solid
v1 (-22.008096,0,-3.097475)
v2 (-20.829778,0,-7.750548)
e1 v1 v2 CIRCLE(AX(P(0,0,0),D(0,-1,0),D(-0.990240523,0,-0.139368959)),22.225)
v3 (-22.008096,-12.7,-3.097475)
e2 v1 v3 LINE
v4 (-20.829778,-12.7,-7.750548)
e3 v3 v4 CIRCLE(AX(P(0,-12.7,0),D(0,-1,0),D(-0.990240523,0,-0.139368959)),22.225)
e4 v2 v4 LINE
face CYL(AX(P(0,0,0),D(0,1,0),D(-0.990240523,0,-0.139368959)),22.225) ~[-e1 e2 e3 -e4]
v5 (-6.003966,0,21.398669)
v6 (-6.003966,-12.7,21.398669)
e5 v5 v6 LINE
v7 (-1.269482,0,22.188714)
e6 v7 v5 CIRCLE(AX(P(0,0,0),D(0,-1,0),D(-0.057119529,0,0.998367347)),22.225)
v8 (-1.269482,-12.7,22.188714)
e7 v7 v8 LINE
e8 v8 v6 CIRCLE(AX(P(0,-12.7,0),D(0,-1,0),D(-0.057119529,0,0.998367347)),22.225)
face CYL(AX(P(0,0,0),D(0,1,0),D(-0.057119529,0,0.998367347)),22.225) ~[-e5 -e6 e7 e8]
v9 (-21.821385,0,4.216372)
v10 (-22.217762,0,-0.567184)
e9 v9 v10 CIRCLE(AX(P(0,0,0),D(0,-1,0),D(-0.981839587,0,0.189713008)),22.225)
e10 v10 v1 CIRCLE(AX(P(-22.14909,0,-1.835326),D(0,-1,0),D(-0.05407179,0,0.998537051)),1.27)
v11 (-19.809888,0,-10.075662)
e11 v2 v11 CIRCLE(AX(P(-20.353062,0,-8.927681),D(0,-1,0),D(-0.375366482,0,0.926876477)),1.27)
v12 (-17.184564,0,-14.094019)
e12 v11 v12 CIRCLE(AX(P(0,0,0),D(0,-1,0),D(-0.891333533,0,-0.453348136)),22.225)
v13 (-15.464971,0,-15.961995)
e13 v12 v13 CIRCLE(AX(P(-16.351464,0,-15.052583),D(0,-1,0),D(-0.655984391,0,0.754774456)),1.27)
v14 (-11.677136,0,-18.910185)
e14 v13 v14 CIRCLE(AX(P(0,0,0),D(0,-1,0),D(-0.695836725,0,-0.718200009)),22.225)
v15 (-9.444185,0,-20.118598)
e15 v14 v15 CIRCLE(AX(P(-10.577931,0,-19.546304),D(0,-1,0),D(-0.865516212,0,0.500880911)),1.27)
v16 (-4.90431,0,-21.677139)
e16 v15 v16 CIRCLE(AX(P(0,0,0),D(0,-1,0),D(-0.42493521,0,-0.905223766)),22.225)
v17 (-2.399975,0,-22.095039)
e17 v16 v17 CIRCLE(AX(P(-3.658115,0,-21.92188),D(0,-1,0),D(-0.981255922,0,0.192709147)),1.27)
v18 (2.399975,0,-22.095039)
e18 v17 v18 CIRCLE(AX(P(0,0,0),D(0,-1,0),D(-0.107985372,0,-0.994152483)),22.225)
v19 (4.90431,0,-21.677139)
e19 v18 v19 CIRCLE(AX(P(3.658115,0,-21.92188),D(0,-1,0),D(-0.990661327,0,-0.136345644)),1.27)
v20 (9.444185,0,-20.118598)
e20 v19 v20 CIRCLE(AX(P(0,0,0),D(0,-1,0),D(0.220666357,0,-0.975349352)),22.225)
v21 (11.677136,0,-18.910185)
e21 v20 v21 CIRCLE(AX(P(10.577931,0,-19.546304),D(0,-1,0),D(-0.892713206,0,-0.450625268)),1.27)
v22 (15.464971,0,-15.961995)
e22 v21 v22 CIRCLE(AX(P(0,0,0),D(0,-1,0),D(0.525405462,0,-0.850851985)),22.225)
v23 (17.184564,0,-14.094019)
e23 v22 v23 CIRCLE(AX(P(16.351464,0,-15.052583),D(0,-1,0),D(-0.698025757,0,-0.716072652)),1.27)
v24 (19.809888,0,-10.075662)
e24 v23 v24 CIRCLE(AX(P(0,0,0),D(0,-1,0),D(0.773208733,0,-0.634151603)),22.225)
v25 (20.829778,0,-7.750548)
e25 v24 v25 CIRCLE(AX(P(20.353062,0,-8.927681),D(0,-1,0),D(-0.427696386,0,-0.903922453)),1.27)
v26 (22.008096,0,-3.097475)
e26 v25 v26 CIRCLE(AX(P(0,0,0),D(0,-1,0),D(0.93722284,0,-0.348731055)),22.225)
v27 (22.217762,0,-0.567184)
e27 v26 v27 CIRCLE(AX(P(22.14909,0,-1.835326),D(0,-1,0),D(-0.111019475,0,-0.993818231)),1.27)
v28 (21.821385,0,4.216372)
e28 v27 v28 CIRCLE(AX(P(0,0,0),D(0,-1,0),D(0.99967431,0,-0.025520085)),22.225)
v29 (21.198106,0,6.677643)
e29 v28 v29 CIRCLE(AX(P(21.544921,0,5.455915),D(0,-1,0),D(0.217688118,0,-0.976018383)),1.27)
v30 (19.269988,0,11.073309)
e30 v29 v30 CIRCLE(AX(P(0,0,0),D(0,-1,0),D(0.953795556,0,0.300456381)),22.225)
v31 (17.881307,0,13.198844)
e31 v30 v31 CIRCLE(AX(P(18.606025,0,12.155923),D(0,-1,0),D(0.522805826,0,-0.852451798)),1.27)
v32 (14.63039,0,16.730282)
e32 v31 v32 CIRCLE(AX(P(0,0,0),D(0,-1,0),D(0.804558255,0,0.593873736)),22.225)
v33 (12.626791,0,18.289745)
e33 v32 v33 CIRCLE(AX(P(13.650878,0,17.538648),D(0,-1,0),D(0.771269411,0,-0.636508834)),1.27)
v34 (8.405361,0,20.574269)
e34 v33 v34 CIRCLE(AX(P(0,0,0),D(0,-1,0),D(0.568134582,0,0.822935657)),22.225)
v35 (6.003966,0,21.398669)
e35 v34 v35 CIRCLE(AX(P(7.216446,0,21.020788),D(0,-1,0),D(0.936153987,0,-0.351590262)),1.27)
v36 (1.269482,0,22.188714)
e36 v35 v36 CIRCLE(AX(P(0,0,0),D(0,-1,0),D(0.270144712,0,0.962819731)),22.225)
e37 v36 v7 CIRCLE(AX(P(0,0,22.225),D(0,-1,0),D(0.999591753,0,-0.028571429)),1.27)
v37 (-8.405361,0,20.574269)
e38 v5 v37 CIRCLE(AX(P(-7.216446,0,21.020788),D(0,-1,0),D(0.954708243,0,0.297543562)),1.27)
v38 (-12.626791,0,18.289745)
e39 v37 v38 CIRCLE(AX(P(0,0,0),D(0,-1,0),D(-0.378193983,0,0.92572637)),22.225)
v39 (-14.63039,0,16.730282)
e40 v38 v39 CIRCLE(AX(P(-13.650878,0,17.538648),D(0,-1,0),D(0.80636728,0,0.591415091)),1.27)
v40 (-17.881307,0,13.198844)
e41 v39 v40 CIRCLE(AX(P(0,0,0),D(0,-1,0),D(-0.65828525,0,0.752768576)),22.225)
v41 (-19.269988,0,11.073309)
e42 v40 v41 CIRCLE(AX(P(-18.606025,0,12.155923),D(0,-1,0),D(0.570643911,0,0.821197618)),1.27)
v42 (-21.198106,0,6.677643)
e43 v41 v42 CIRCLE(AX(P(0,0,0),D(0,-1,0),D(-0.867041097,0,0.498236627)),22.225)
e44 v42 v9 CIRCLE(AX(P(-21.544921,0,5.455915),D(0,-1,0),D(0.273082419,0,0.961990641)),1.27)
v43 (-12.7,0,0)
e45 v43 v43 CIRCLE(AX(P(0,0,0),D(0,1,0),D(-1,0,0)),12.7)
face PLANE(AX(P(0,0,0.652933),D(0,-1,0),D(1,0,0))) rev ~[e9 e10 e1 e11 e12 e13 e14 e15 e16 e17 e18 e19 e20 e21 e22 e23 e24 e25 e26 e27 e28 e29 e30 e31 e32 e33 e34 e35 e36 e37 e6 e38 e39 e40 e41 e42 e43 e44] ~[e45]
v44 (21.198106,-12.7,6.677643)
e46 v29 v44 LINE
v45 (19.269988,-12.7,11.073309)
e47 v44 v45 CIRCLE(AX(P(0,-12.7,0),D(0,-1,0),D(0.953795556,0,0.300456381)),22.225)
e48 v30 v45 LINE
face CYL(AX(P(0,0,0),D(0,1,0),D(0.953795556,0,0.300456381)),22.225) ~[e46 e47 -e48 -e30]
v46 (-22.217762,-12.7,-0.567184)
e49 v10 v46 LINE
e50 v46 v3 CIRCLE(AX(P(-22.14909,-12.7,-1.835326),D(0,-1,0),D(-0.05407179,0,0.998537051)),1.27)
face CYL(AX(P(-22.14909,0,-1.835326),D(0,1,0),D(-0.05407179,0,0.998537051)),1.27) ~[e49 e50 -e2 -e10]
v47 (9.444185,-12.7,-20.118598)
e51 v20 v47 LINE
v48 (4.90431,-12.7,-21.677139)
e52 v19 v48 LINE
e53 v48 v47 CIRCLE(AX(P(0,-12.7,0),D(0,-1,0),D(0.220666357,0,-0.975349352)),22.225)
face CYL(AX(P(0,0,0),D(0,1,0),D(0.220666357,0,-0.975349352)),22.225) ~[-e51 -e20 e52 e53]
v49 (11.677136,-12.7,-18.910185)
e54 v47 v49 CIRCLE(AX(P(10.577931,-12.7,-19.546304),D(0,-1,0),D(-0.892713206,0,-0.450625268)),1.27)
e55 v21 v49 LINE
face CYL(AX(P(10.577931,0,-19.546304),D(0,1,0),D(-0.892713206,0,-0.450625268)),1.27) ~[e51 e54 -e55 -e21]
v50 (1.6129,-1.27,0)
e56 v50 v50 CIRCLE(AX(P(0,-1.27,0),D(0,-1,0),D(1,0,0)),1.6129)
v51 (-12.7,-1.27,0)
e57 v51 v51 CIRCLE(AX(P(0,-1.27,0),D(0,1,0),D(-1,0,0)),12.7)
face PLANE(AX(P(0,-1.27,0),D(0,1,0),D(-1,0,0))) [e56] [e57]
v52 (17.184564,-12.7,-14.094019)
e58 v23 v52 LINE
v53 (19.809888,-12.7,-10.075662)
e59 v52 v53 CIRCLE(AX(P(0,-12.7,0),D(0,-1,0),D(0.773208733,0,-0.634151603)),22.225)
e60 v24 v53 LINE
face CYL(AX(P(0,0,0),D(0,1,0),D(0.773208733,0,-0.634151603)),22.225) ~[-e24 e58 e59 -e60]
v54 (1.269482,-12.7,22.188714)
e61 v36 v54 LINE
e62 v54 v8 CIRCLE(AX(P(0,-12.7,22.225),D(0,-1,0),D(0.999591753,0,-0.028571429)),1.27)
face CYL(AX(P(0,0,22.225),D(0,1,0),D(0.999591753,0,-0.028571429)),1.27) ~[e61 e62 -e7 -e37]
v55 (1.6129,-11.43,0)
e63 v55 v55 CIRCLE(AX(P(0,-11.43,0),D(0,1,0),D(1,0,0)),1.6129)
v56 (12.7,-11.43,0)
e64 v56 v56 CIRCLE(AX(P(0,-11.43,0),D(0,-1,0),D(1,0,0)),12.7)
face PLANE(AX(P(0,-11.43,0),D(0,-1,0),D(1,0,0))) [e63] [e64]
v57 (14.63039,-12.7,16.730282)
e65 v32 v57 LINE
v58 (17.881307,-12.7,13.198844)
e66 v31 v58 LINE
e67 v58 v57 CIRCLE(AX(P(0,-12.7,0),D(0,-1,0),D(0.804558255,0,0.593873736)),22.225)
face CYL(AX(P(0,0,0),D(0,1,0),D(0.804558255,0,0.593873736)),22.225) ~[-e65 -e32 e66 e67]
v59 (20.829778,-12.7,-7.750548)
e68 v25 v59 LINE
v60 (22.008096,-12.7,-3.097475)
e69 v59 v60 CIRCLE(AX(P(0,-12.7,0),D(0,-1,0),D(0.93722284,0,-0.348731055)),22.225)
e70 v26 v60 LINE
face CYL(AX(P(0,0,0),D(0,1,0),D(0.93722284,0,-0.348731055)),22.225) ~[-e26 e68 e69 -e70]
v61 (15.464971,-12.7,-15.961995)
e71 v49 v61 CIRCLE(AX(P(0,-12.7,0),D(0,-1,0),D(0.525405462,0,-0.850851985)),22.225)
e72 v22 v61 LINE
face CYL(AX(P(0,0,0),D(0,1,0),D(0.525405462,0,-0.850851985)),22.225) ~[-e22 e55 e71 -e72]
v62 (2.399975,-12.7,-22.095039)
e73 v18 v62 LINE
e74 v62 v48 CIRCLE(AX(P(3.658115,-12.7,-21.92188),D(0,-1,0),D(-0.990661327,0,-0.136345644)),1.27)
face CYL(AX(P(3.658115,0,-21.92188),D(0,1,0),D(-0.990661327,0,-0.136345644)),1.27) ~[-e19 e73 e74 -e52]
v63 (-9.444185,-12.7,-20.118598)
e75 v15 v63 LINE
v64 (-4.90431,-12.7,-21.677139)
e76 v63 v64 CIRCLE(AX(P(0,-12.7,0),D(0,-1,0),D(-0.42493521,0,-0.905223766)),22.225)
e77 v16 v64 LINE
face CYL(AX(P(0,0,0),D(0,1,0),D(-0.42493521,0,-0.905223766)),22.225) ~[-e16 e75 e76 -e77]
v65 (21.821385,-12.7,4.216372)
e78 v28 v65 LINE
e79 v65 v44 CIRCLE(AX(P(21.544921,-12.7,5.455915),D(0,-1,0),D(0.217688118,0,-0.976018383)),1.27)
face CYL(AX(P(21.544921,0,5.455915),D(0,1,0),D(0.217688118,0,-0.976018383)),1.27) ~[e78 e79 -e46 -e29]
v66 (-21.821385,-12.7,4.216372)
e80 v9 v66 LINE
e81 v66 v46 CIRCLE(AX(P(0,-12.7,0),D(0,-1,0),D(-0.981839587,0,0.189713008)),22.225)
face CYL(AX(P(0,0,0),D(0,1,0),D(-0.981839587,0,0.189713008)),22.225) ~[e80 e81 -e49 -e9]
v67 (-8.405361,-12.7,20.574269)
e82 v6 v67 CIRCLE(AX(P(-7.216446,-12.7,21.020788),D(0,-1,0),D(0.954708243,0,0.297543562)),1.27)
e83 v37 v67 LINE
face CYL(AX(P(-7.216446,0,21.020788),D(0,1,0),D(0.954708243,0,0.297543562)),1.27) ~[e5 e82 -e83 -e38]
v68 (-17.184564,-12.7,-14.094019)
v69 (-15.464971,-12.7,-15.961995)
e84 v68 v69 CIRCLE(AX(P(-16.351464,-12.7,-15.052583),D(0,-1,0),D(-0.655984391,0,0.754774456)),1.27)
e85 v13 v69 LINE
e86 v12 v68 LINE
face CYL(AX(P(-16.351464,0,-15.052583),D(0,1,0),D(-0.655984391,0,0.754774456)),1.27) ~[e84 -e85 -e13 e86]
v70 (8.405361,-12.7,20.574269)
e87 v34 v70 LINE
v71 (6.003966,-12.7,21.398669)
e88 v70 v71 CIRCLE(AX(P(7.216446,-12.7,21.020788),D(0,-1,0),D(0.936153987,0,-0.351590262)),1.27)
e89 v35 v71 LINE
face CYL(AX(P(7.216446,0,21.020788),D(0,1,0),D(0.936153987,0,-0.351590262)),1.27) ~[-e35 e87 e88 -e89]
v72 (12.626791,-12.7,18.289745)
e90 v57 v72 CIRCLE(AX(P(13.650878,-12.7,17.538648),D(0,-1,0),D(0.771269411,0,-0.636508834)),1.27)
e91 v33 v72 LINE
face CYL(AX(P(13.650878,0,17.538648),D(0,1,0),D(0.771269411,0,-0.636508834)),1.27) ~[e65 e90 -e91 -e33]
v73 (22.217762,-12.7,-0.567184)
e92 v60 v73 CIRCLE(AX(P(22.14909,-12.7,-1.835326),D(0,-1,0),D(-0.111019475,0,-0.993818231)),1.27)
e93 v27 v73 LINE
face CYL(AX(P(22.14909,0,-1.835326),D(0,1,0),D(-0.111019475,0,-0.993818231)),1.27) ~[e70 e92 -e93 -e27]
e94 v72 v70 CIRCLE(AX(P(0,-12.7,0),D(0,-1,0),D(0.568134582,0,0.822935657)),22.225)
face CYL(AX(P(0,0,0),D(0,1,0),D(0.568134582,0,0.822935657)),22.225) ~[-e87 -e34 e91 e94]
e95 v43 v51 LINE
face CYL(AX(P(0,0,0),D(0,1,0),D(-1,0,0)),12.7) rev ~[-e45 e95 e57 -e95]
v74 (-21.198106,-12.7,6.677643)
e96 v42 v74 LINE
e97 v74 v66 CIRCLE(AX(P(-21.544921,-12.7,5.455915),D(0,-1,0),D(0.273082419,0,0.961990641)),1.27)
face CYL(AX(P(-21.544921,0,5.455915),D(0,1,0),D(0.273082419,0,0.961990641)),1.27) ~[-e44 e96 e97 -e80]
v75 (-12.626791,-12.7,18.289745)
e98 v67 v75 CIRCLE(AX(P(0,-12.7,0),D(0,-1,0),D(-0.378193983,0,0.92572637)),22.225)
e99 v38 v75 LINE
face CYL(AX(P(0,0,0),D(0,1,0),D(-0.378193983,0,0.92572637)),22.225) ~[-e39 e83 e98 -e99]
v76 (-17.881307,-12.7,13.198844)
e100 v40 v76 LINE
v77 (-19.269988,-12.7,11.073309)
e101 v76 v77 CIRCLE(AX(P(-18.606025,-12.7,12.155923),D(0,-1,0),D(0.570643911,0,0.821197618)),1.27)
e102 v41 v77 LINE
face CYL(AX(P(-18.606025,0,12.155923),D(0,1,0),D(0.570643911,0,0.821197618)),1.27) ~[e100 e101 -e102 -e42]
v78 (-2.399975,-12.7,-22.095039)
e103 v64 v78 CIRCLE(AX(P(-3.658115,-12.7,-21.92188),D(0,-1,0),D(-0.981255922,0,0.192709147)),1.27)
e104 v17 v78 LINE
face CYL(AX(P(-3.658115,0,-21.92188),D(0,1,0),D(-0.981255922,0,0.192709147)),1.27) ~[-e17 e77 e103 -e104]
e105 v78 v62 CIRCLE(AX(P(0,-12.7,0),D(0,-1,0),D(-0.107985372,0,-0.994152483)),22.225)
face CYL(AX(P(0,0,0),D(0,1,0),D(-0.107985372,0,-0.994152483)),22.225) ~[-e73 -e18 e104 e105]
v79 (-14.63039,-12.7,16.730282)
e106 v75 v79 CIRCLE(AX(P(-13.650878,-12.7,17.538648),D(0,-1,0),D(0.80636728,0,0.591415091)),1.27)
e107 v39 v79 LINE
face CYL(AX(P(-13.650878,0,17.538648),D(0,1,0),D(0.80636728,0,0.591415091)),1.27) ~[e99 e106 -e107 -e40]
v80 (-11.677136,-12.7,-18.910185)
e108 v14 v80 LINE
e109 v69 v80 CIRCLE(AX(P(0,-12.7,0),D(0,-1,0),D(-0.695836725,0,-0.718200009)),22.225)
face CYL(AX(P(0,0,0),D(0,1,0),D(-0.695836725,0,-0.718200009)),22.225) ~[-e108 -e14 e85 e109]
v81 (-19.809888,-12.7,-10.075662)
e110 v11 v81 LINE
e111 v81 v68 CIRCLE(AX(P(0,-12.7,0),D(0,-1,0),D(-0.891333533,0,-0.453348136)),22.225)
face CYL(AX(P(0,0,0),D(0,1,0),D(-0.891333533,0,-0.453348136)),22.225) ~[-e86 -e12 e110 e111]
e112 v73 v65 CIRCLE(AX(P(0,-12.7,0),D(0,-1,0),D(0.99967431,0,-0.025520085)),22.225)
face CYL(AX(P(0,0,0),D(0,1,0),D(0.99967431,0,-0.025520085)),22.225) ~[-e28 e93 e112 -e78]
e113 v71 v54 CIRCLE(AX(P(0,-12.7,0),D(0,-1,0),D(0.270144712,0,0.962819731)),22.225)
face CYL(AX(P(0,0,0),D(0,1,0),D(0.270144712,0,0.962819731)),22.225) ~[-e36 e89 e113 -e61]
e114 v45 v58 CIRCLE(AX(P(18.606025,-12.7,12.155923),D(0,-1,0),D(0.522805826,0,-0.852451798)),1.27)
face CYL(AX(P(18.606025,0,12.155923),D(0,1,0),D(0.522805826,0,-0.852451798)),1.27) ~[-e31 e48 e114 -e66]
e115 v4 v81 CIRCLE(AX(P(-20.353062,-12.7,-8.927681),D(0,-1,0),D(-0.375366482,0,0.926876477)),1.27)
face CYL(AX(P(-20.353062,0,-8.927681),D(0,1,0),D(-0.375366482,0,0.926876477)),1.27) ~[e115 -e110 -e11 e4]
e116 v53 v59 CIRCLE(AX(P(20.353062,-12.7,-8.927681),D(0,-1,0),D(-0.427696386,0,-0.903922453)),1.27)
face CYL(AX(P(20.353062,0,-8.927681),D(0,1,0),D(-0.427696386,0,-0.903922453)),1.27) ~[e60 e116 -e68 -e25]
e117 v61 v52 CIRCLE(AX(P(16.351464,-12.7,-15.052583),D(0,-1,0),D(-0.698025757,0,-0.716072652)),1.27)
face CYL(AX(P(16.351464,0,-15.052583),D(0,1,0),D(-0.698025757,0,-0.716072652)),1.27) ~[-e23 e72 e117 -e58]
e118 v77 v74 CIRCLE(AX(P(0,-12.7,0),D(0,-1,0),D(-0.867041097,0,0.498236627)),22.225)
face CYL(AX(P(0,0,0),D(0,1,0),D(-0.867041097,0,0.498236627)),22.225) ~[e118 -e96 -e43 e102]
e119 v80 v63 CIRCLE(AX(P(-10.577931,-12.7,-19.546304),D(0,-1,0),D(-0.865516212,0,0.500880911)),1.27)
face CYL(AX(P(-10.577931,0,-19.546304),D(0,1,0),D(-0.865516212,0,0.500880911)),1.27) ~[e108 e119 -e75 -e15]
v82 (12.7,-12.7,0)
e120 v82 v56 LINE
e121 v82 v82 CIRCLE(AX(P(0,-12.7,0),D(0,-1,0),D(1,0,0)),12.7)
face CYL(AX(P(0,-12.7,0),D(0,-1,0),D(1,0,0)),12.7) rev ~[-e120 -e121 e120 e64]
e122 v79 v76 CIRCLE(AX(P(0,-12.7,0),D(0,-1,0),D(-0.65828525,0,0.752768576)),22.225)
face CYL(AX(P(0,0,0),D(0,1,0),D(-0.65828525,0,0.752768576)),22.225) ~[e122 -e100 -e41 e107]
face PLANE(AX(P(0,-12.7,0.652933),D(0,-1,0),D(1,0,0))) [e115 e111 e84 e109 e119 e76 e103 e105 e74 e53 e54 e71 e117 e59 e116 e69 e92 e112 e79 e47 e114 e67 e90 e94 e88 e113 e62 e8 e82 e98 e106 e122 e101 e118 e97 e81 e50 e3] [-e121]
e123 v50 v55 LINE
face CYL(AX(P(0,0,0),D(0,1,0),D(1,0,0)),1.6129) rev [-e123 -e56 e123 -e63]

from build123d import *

# Parameters (mm, degrees)
F0_R     = 16.51
F0_R_2   = 1.6129
F1_DEPTH = 12.7
F3_R     = 12.7
F3_R_2   = 1.6129
F2_R     = 12.7
F2_R_2   = 1.6129
F4_DEPTH = 1.27
F5_DEPTH = 1.27


# Not quite as in the source:
# - the program builds the solid bodies; features that only make, move or delete a surface that nothing else refers to are left out


with BuildPart() as f1:
    # F0 (on Front) → F1 (new body)
    with BuildSketch(Plane.XZ):
        with BuildLine():
            ThreePointArc((1.2694815268, 22.1887142857), (0, 23.495), (-1.2694815268, 22.1887142857))
            ThreePointArc((-1.2694815268, 22.1887142857), (-3.658114769, 21.9218799681), (-6.0039662348, 21.3986685205))
            ThreePointArc((-6.0039662348, 21.3986685205), (-7.628814029, 22.2219760938), (-8.405361267, 20.5742685647))
            ThreePointArc((-8.405361267, 20.5742685647), (-10.5779308102, 19.5463041206), (-12.6267910938, 18.2897449866))
            ThreePointArc((-12.6267910938, 18.2897449866), (-13.6508775395, 17.5386478213), (-14.6303896913, 16.730281602))
            ThreePointArc((-14.6303896913, 16.730281602), (-16.3514639147, 15.0525829294), (-17.8813072129, 13.1988437887))
            ThreePointArc((-17.8813072129, 13.1988437887), (-18.6060249794, 12.1559228143), (-19.2699883786, 11.0733090306))
            ThreePointArc((-19.2699883786, 11.0733090306), (-20.3530621849, 8.9276808129), (-21.1981062384, 6.6776430652))
            ThreePointArc((-21.1981062384, 6.6776430652), (-21.5449209105, 5.4559149517), (-21.8213848205, 4.2163716058))
            ThreePointArc((-21.8213848205, 4.2163716058), (-22.1490903571, 1.8353259531), (-22.2177615305, -0.5671838988))
            ThreePointArc((-22.2177615305, -0.5671838988), (-22.1490903571, -1.8353259531), (-22.0080956233, -3.0974751064))
            ThreePointArc((-22.0080956233, -3.0974751064), (-21.5449209105, -5.4559149517), (-20.8297776166, -7.7505476866))
            ThreePointArc((-20.8297776166, -7.7505476866), (-20.3530621849, -8.9276808129), (-19.8098877746, -10.0756623284))
            ThreePointArc((-19.8098877746, -10.0756623284), (-18.6060249794, -12.1559228143), (-17.1845640907, -14.0940193703))
            ThreePointArc((-17.1845640907, -14.0940193703), (-16.3514639147, -15.0525829294), (-15.4649712035, -15.9619951972))
            ThreePointArc((-15.4649712035, -15.9619951972), (-13.6508775395, -17.5386478213), (-11.6771363996, -18.9101853641))
            ThreePointArc((-11.6771363996, -18.9101853641), (-10.5779308102, -19.5463041206), (-9.4441850386, -20.1185982105))
            ThreePointArc((-9.4441850386, -20.1185982105), (-7.2164457031, -21.0207881968), (-4.9043097902, -21.6771393519))
            ThreePointArc((-4.9043097902, -21.6771393519), (-3.658114769, -21.9218799681), (-2.3999748833, -22.0950389355))
            ThreePointArc((-2.3999748833, -22.0950389355), (0, -22.225), (2.3999748833, -22.0950389355))
            ThreePointArc((2.3999748833, -22.0950389355), (3.658114769, -21.9218799681), (4.9043097902, -21.6771393519))
            ThreePointArc((4.9043097902, -21.6771393519), (7.2164457031, -21.0207881968), (9.4441850386, -20.1185982105))
            ThreePointArc((9.4441850386, -20.1185982105), (10.5779308102, -19.5463041206), (11.6771363996, -18.9101853641))
            ThreePointArc((11.6771363996, -18.9101853641), (13.6508775395, -17.5386478213), (15.4649712035, -15.9619951972))
            ThreePointArc((15.4649712035, -15.9619951972), (16.3514639147, -15.0525829294), (17.1845640907, -14.0940193703))
            ThreePointArc((17.1845640907, -14.0940193703), (18.6060249794, -12.1559228143), (19.8098877746, -10.0756623284))
            ThreePointArc((19.8098877746, -10.0756623284), (20.3530621849, -8.9276808129), (20.8297776166, -7.7505476866))
            ThreePointArc((20.8297776166, -7.7505476866), (21.5449209105, -5.4559149517), (22.0080956233, -3.0974751064))
            ThreePointArc((22.0080956233, -3.0974751064), (22.1490903571, -1.8353259531), (22.2177615305, -0.5671838988))
            ThreePointArc((22.2177615305, -0.5671838988), (22.1490903571, 1.8353259531), (21.8213848205, 4.2163716058))
            ThreePointArc((21.8213848205, 4.2163716058), (21.5449209105, 5.4559149517), (21.1981062384, 6.6776430652))
            ThreePointArc((21.1981062384, 6.6776430652), (20.3530621849, 8.9276808129), (19.2699883786, 11.0733090306))
            ThreePointArc((19.2699883786, 11.0733090306), (18.6060249794, 12.1559228143), (17.8813072129, 13.1988437887))
            ThreePointArc((17.8813072129, 13.1988437887), (16.3514639147, 15.0525829294), (14.6303896913, 16.730281602))
            ThreePointArc((14.6303896913, 16.730281602), (13.6508775395, 17.5386478213), (12.6267910938, 18.2897449866))
            ThreePointArc((12.6267910938, 18.2897449866), (10.5779308102, 19.5463041206), (8.405361267, 20.5742685647))
            ThreePointArc((8.405361267, 20.5742685647), (7.628814029, 22.2219760938), (6.0039662348, 21.3986685205))
            ThreePointArc((6.0039662348, 21.3986685205), (3.658114769, 21.9218799681), (1.2694815268, 22.1887142857))
        make_face()
        Circle(F0_R, mode=Mode.SUBTRACT)
        Circle(F0_R)
        Circle(F0_R_2, mode=Mode.SUBTRACT)
        with BuildLine():
            ThreePointArc((-19.2699883786, 11.0733090306), (-18.6060249794, 12.1559228143), (-17.8813072129, 13.1988437887))
            ThreePointArc((-17.8813072129, 13.1988437887), (-19.6692264068, 12.8505469751), (-19.2699883786, 11.0733090306))
        make_face()
        with BuildLine():
            ThreePointArc((-14.6303896913, 16.730281602), (-13.6508775395, 17.5386478213), (-12.6267910938, 18.2897449866))
            ThreePointArc((-12.6267910938, 18.2897449866), (-14.4309276846, 18.5408562683), (-14.6303896913, 16.730281602))
        make_face()
        with BuildLine():
            ThreePointArc((14.6303896913, 16.730281602), (14.4309276846, 18.5408562683), (12.6267910938, 18.2897449866))
            ThreePointArc((12.6267910938, 18.2897449866), (13.6508775395, 17.5386478213), (14.6303896913, 16.730281602))
        make_face()
        with BuildLine():
            ThreePointArc((19.2699883786, 11.0733090306), (19.6692264068, 12.8505469751), (17.8813072129, 13.1988437887))
            ThreePointArc((17.8813072129, 13.1988437887), (18.6060249794, 12.1559228143), (19.2699883786, 11.0733090306))
        make_face()
        with BuildLine():
            ThreePointArc((21.8213848205, 4.2163716058), (22.7760592482, 5.7676815204), (21.1981062384, 6.6776430652))
            ThreePointArc((21.1981062384, 6.6776430652), (21.5449209105, 5.4559149517), (21.8213848205, 4.2163716058))
        make_face()
        with BuildLine():
            ThreePointArc((22.0080956233, -3.0974751064), (23.4147526632, -1.9402017219), (22.2177615305, -0.5671838988))
            ThreePointArc((22.2177615305, -0.5671838988), (22.1490903571, -1.8353259531), (22.0080956233, -3.0974751064))
        make_face()
        with BuildLine():
            ThreePointArc((-21.8213848205, 4.2163716058), (-21.5449209105, 5.4559149517), (-21.1981062384, 6.6776430652))
            ThreePointArc((-21.1981062384, 6.6776430652), (-22.7760592482, 5.7676815204), (-21.8213848205, 4.2163716058))
        make_face()
        with BuildLine():
            ThreePointArc((-22.0080956233, -3.0974751064), (-22.1490903571, -1.8353259531), (-22.2177615305, -0.5671838988))
            ThreePointArc((-22.2177615305, -0.5671838988), (-23.4147526632, -1.9402017219), (-22.0080956233, -3.0974751064))
        make_face()
        with BuildLine():
            ThreePointArc((-19.8098877746, -10.0756623284), (-20.3530621849, -8.9276808129), (-20.8297776166, -7.7505476866))
            ThreePointArc((-20.8297776166, -7.7505476866), (-21.5160943098, -9.4378340022), (-19.8098877746, -10.0756623284))
        make_face()
        with BuildLine():
            ThreePointArc((-15.4649712035, -15.9619951972), (-16.3514639147, -15.0525829294), (-17.1845640907, -14.0940193703))
            ThreePointArc((-17.1845640907, -14.0940193703), (-17.2858332813, -15.9127305253), (-15.4649712035, -15.9619951972))
        make_face()
        with BuildLine():
            ThreePointArc((-9.4441850386, -20.1185982105), (-10.5779308102, -19.5463041206), (-11.6771363996, -18.9101853641))
            ThreePointArc((-11.6771363996, -18.9101853641), (-11.1823839994, -20.6632357846), (-9.4441850386, -20.1185982105))
        make_face()
        with BuildLine():
            ThreePointArc((-2.3999748833, -22.0950389355), (-3.658114769, -21.9218799681), (-4.9043097902, -21.6771393519))
            ThreePointArc((-4.9043097902, -21.6771393519), (-3.8671498986, -23.1745588234), (-2.3999748833, -22.0950389355))
        make_face()
        with BuildLine():
            ThreePointArc((2.3999748833, -22.0950389355), (3.8671498986, -23.1745588234), (4.9043097902, -21.6771393519))
            ThreePointArc((4.9043097902, -21.6771393519), (3.658114769, -21.9218799681), (2.3999748833, -22.0950389355))
        make_face()
        with BuildLine():
            ThreePointArc((9.4441850386, -20.1185982105), (11.1823839994, -20.6632357846), (11.6771363996, -18.9101853641))
            ThreePointArc((11.6771363996, -18.9101853641), (10.5779308102, -19.5463041206), (9.4441850386, -20.1185982105))
        make_face()
        with BuildLine():
            ThreePointArc((15.4649712035, -15.9619951972), (17.2858332813, -15.9127305253), (17.1845640907, -14.0940193703))
            ThreePointArc((17.1845640907, -14.0940193703), (16.3514639147, -15.0525829294), (15.4649712035, -15.9619951972))
        make_face()
        with BuildLine():
            ThreePointArc((19.8098877746, -10.0756623284), (21.5160943098, -9.4378340022), (20.8297776166, -7.7505476866))
            ThreePointArc((20.8297776166, -7.7505476866), (20.3530621849, -8.9276808129), (19.8098877746, -10.0756623284))
        make_face()
    extrude(amount=F1_DEPTH)

    # F3 (on face) + F2 (on face) → F4 (cut)
    with BuildSketch(Plane(origin=(0, 0, 0), x_dir=(-1, 0, 0), z_dir=(0, 1, 0))):
        Circle(F3_R)
        Circle(F3_R_2, mode=Mode.SUBTRACT)
    with BuildSketch(Plane.XZ.offset(12.7)):
        Circle(F2_R)
        Circle(F2_R_2, mode=Mode.SUBTRACT)
    extrude(amount=-F4_DEPTH, dir=(0, 1, 0), mode=Mode.SUBTRACT)

    # F2 (on face) → F5 (cut)
    with BuildSketch(Plane.XZ.offset(12.7)):
        Circle(F2_R)
    extrude(amount=-F5_DEPTH, mode=Mode.SUBTRACT)


solid = f1.part
